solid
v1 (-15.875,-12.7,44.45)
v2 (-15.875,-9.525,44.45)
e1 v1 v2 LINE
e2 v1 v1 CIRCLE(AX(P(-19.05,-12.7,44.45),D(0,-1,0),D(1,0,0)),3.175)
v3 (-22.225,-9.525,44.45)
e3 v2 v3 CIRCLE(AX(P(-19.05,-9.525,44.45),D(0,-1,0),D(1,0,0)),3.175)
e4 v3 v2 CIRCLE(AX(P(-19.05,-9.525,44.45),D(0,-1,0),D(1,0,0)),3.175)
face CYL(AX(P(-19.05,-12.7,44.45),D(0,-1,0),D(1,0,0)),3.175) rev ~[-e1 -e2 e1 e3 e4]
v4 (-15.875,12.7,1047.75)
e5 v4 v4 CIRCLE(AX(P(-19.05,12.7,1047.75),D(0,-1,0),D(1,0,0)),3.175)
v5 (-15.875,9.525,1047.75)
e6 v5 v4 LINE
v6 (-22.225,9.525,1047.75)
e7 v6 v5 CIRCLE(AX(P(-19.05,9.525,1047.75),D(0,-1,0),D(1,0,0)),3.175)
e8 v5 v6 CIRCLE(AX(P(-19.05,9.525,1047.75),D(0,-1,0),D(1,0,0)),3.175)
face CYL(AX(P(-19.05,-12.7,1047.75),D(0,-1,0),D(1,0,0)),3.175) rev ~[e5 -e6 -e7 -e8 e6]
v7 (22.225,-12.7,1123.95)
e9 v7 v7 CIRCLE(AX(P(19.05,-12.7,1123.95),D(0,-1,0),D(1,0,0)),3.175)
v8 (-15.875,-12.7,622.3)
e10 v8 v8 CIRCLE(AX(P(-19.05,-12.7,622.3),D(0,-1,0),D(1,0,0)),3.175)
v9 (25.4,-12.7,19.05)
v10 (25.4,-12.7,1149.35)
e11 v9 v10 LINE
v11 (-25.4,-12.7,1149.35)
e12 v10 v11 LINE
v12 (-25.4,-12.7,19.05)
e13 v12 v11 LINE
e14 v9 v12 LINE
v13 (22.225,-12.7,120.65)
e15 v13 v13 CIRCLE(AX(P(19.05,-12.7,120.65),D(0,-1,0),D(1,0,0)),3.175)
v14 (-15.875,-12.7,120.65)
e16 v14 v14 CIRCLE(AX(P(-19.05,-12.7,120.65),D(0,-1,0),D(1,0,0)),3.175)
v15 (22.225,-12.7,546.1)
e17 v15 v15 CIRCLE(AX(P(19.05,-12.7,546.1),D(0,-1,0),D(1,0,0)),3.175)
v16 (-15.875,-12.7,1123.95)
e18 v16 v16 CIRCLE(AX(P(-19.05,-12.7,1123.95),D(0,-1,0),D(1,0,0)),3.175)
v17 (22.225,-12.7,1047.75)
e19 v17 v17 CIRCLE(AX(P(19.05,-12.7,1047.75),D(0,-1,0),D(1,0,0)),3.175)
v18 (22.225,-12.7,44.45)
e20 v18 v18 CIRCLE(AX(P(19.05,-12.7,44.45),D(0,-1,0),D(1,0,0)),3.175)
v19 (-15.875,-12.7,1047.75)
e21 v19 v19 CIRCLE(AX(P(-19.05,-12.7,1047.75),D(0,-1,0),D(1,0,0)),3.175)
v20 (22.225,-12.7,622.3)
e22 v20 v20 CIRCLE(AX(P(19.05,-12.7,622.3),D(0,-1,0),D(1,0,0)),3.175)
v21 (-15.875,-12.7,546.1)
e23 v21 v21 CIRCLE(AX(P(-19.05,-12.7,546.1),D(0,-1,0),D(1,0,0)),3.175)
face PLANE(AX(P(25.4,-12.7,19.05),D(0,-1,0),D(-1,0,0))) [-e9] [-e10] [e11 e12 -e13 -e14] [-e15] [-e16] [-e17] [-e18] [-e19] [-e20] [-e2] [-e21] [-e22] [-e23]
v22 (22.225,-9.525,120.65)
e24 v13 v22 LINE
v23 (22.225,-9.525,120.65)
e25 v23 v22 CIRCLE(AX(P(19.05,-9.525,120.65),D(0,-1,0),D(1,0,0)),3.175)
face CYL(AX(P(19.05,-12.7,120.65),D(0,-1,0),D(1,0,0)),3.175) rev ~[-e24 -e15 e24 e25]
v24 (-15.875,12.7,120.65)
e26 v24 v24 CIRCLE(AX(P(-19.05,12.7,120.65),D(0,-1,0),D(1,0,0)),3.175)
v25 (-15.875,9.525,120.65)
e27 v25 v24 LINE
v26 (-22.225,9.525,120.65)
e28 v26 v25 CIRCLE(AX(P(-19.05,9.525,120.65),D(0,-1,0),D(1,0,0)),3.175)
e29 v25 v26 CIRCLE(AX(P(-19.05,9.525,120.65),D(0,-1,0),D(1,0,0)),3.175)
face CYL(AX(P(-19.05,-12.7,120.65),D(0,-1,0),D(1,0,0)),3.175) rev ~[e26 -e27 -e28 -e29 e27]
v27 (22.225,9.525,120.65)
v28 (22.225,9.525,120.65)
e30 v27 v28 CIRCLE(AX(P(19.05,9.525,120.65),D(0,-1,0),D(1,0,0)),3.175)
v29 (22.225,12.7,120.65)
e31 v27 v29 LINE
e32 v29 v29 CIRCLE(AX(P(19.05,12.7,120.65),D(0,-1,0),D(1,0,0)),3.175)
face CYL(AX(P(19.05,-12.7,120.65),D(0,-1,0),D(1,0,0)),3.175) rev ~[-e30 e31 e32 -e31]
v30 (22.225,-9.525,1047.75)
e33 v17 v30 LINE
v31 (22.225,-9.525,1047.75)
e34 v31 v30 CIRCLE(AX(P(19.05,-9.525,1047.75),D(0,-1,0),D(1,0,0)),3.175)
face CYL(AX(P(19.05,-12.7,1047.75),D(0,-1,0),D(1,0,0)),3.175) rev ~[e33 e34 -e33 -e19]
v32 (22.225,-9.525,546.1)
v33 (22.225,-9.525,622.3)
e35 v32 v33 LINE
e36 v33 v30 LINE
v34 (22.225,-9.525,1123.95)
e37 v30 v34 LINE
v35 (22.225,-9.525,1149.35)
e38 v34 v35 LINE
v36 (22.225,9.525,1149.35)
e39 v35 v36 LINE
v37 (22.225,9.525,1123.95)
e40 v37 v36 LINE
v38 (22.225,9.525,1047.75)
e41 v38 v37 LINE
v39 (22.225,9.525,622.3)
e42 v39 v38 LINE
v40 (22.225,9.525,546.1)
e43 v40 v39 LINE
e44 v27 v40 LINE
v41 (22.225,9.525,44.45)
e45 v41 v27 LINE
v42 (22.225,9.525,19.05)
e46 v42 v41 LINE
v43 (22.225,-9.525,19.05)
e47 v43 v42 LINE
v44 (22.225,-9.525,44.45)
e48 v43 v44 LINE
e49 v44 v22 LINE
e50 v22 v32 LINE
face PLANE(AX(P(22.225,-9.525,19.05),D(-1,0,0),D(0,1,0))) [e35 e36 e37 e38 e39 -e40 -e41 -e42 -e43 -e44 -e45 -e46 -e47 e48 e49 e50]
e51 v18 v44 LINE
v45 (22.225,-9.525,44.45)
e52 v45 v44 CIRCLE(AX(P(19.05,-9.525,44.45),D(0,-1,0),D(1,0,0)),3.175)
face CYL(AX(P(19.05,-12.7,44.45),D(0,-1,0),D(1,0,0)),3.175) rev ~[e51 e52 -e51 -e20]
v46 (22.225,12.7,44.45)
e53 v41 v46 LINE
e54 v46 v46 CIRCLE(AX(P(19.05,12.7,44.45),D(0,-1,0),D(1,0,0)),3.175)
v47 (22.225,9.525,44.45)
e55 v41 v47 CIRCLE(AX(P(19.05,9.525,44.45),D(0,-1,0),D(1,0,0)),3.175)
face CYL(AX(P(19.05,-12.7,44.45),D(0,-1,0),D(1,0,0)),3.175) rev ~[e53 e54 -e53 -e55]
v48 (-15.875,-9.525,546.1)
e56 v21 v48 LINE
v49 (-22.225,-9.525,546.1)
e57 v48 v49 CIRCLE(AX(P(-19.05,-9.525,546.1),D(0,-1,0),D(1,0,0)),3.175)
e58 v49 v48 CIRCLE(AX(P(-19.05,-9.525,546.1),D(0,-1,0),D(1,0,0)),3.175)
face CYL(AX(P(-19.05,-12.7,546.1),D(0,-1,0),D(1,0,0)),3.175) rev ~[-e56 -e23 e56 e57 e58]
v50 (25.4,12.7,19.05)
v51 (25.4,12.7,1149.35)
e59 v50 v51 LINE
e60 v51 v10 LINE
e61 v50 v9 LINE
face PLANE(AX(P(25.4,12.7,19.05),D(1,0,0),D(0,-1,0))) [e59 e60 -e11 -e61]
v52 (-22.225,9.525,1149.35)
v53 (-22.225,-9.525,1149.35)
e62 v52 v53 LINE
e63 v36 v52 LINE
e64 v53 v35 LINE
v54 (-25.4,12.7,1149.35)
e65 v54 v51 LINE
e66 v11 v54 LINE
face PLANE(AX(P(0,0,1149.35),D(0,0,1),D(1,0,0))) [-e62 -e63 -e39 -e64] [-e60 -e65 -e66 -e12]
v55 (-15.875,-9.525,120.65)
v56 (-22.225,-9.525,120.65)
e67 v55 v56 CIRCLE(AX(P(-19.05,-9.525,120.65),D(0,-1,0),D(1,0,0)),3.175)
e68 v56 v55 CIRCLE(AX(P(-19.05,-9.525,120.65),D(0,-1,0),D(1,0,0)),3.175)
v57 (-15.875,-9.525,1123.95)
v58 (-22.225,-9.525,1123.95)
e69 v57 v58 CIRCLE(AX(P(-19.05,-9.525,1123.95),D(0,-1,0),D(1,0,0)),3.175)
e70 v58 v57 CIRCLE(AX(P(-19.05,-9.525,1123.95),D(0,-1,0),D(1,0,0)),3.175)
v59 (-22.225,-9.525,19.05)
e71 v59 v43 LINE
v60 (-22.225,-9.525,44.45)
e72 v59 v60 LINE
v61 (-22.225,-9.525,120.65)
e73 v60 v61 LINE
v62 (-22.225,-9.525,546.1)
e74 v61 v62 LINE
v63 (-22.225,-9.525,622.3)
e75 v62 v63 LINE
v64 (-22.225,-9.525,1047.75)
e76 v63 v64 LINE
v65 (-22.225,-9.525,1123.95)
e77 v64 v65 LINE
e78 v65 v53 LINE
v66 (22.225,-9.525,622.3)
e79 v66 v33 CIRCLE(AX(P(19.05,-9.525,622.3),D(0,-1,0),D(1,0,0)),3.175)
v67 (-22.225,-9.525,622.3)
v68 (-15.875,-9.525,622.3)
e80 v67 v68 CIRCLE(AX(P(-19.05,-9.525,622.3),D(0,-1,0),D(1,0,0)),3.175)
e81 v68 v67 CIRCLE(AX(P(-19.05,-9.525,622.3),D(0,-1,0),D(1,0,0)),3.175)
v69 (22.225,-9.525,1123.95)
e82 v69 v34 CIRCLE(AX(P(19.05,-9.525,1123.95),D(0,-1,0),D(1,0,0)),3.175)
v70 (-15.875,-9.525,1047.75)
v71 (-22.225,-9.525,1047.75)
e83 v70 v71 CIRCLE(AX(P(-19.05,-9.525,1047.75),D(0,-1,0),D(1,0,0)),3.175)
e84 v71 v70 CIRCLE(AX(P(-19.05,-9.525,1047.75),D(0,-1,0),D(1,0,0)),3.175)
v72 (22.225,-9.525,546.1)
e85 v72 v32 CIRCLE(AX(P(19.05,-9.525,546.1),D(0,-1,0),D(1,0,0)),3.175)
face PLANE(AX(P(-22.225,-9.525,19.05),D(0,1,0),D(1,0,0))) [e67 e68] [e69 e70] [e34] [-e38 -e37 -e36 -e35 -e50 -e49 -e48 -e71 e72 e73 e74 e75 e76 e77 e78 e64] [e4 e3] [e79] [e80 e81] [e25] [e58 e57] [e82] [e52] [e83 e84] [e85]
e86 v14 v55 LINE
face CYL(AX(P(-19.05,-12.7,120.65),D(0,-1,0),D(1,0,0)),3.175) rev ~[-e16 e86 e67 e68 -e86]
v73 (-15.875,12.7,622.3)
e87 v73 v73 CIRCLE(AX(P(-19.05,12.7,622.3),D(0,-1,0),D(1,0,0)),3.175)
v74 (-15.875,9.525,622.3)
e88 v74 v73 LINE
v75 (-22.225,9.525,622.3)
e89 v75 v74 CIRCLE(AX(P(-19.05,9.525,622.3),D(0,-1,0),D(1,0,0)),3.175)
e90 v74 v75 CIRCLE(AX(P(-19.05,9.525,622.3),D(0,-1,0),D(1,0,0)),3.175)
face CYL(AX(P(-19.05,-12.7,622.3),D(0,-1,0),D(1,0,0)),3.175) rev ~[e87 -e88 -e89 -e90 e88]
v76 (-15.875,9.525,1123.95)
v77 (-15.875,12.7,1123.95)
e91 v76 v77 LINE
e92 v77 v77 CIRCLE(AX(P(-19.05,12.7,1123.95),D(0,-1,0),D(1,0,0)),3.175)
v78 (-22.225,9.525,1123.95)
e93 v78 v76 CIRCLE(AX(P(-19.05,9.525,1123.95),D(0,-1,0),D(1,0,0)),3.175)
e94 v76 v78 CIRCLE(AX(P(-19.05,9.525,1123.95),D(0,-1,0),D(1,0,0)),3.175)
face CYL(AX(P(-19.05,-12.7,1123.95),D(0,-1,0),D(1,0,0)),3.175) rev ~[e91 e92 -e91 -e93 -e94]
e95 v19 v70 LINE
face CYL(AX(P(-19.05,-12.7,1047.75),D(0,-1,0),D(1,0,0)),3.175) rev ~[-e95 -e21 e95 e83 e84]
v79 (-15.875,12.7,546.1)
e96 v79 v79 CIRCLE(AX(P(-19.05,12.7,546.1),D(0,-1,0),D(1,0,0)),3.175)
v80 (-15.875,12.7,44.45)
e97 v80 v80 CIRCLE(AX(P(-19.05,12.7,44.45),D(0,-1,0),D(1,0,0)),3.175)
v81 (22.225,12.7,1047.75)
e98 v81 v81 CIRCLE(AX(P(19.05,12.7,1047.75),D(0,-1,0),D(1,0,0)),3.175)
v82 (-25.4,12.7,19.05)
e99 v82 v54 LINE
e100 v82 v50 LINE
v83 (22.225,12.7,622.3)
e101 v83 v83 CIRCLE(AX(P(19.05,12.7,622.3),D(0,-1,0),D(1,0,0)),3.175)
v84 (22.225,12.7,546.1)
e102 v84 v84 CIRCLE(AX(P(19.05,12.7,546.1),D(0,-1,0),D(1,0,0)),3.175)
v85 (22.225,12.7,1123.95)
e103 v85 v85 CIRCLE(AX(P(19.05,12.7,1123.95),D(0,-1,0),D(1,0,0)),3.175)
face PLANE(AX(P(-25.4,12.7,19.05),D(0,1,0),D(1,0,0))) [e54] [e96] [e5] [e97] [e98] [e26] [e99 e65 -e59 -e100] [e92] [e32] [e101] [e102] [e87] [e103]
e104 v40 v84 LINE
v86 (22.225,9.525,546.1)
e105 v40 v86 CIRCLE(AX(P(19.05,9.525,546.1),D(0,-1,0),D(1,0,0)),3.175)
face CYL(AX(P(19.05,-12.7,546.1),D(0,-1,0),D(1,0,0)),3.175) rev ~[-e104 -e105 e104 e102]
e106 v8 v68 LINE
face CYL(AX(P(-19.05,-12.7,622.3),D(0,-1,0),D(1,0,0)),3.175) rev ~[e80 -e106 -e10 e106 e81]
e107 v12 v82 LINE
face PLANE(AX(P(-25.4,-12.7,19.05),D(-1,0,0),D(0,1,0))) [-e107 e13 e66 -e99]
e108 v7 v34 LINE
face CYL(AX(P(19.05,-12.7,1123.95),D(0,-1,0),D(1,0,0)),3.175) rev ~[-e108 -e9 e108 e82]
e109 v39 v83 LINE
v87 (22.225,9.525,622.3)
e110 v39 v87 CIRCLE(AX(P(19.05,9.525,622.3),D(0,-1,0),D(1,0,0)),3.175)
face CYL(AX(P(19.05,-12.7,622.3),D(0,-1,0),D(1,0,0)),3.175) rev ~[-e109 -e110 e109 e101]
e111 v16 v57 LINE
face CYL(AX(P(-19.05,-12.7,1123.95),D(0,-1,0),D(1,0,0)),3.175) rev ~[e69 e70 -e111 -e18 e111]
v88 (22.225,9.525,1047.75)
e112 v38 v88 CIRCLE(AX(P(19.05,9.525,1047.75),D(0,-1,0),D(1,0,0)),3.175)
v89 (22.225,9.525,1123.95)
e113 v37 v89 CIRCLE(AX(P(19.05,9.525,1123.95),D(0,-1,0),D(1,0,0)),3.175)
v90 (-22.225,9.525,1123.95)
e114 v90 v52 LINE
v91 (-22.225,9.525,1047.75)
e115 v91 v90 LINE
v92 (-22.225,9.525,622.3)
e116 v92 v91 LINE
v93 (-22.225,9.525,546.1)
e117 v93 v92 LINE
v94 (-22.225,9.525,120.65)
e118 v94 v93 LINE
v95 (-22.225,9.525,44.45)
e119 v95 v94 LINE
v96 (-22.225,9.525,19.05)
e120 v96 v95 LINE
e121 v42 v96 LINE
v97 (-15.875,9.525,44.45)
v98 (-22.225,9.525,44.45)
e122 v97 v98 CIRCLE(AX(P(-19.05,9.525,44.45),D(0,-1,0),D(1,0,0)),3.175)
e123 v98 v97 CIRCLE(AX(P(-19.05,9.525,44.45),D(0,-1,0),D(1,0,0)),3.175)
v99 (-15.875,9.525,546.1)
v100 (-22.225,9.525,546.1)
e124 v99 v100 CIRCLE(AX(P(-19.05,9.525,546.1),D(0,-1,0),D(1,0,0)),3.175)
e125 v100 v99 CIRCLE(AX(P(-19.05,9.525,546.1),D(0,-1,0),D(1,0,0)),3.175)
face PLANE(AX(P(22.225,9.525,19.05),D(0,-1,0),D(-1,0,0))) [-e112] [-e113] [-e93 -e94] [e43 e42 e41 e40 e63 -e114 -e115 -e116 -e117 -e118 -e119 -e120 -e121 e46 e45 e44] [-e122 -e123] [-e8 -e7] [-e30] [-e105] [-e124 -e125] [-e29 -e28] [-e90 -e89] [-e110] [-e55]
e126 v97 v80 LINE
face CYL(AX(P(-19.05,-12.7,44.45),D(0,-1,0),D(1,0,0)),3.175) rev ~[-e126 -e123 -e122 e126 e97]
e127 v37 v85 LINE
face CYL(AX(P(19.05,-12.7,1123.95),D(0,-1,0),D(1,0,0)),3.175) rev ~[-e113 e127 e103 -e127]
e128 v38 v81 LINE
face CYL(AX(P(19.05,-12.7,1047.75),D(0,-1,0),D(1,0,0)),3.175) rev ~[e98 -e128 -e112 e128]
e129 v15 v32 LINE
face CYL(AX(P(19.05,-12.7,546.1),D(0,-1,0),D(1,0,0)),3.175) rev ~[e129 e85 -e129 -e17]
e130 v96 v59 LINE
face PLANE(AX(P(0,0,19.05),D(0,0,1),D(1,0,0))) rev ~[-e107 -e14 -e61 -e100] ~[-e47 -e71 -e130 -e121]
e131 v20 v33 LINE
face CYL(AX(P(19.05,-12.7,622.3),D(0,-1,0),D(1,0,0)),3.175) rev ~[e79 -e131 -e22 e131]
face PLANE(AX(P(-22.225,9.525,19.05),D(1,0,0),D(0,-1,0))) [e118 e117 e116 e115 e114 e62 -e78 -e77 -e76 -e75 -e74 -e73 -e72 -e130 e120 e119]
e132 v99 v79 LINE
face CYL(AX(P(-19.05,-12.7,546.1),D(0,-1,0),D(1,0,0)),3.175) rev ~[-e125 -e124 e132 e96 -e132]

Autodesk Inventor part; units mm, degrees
sketch "Caster Hole Pattern" plane through (0, 0, 0) normal (0, 0, 1) x (1, 0, 0)
  line L0 (74.7996, 108.7246) -> (112.8996, 108.7246) construction
  line L1 (112.8996, 108.7246) -> (112.8996, 32.5246) construction
  line L2 (112.8996, 32.5246) -> (74.7996, 32.5246) construction
  line L3 (74.7996, 32.5246) -> (74.7996, 108.7246) construction
  circle A0 centre (112.8996, 108.7246) radius 3.175
  circle A1 centre (112.8996, 32.5246) radius 3.175
  circle A2 centre (74.7996, 32.5246) radius 3.175
  circle A3 centre (74.7996, 108.7246) radius 3.175
  point P0 (93.8496, 57.9246)
  dimension "d11" = 38.1
  dimension "d12" = 76.2
  dimension "d13" = 6.35
ref_plane "Start Plane" through (0, 0, 19.05) normal (0, 0, 1) x (1, 0, 0)
ref_plane "End Plane" through (0, 0, 1149.35) normal (0, 0, 1) x (1, 0, 0)
sketch "Sketch" plane through (0, 0, 0) normal (0, 0, 1) x (1, 0, 0)
  line L0 (-25.4, 12.7) -> (25.4, 12.7)
  line L1 (25.4, 12.7) -> (25.4, -12.7)
  line L2 (25.4, -12.7) -> (-25.4, -12.7)
  line L3 (-25.4, -12.7) -> (-25.4, 12.7)
  line L4 (22.225, 9.525) -> (-22.225, 9.525)
  line L5 (-22.225, 9.525) -> (-22.225, -9.525)
  line L6 (-22.225, -9.525) -> (22.225, -9.525)
  line L7 (22.225, -9.525) -> (22.225, 9.525)
  point P0 (0, 0)
  point P1 (0, 12.7)
  point P2 (-25.4, 0)
  dimension "d0" = 50.8
  dimension "d1" = 25.4
  dimension "d2" = 3.175
extrude "Body" add sketch "Sketch" along normal up to surface (1130.3 mm away) from surface at 19.05
sketch "Sketch2" plane through (0, 0, 0) normal (0, 0, 1) x (1, 0, 0)
  line L0 (0, 0) -> (10, 0)
ref_plane "Work Plane3" through (0, 0, 0) normal (0, -1, 0) x (1, 0, 0)
sketch "Sketch3" plane through (0, 0, 0) normal (0, -1, 0) x (1, 0, 0)
  line L0 (-2, 19.05) -> (12, 19.05)
  line L1 (-2, 1149.35) -> (12, 1149.35)
  dimension "d10" = 1130.3
ref_plane "Work Plane4" through (-755.65, -19.05, 19.05) normal (0, 0, -1) x (-1, 0, 0)
split "Split1" plane through (-755.65, -19.05, 19.05) removes the side toward (0, 0, -1)
ref_plane "Work Plane5" through (6.35, -19.05, 1149.35) normal (0, 0, 1) x (1, 0, 0)
split "Split2" plane through (6.35, -19.05, 1149.35) removes the side toward (0, 0, 1)
sketch "Sketch4" plane through (-25.4, -12.7, 19.05) normal (0, -1, 0) x (1, 0, 0)
  line L0 (50.8, 0) -> (0, 0) projected
  line L1 (50.8, 1130.3) -> (0, 1130.3) projected
  line L2 (0, 0) -> (0, 1130.3) projected
  line L3 (6.35, 101.6) -> (44.45, 101.6) construction
  line L4 (44.45, 101.6) -> (44.45, 25.4) construction
  line L5 (44.45, 25.4) -> (6.35, 25.4) construction
  line L6 (6.35, 25.4) -> (6.35, 101.6) construction
  circle A0 centre (44.45, 101.6) radius 3.175
  circle A1 centre (44.45, 25.4) radius 3.175
  circle A2 centre (6.35, 25.4) radius 3.175
  circle A3 centre (6.35, 101.6) radius 3.175
  line L7 (6.35, 603.25) -> (44.45, 603.25) construction
  line L8 (44.45, 603.25) -> (44.45, 527.05) construction
  line L9 (44.45, 527.05) -> (6.35, 527.05) construction
  line L10 (6.35, 527.05) -> (6.35, 603.25) construction
  circle A4 centre (44.45, 603.25) radius 3.175
  circle A5 centre (44.45, 527.05) radius 3.175
  circle A6 centre (6.35, 527.05) radius 3.175
  circle A7 centre (6.35, 603.25) radius 3.175
  line L11 (6.35, 1104.9) -> (44.45, 1104.9) construction
  line L12 (44.45, 1104.9) -> (44.45, 1028.7) construction
  line L13 (44.45, 1028.7) -> (6.35, 1028.7) construction
  line L14 (6.35, 1028.7) -> (6.35, 1104.9) construction
  circle A8 centre (44.45, 1104.9) radius 3.175
  circle A9 centre (44.45, 1028.7) radius 3.175
  circle A10 centre (6.35, 1028.7) radius 3.175
  circle A11 centre (6.35, 1104.9) radius 3.175
  point P0 (25.4, -19.05)
  point P1 (25.4, 1028.7)
  point P2 (25.4, 603.25)
  point P3 (25.4, 527.05)
  point P4 (25.4, 101.6)
  point P5 (25.4, 25.4)
  point P6 (25.4, 0)
  point P7 (6.35, 565.15)
  point P8 (0, 565.15)
  dimension "d14" = 25.4
  dimension "d18" = 25.4
extrude "Extrusion3" cut sketch "Sketch4" against normal up to surface (25.4 mm away)
equation "\"d18\" = d14"
equation "\"G_OFFSET_START\" = -19.05"
equation "\"G_OFFSET_END\" = -19.05"
equation "\"d5\" = -G_OFFSET_START"
equation "\"d6\" = length + G_OFFSET_END"
equation "\"G_L\" = 1130.3"
equation "\"length\" = 1168.4"
properties part number "2x1x.125 Tube" material "Aluminum-6061"
